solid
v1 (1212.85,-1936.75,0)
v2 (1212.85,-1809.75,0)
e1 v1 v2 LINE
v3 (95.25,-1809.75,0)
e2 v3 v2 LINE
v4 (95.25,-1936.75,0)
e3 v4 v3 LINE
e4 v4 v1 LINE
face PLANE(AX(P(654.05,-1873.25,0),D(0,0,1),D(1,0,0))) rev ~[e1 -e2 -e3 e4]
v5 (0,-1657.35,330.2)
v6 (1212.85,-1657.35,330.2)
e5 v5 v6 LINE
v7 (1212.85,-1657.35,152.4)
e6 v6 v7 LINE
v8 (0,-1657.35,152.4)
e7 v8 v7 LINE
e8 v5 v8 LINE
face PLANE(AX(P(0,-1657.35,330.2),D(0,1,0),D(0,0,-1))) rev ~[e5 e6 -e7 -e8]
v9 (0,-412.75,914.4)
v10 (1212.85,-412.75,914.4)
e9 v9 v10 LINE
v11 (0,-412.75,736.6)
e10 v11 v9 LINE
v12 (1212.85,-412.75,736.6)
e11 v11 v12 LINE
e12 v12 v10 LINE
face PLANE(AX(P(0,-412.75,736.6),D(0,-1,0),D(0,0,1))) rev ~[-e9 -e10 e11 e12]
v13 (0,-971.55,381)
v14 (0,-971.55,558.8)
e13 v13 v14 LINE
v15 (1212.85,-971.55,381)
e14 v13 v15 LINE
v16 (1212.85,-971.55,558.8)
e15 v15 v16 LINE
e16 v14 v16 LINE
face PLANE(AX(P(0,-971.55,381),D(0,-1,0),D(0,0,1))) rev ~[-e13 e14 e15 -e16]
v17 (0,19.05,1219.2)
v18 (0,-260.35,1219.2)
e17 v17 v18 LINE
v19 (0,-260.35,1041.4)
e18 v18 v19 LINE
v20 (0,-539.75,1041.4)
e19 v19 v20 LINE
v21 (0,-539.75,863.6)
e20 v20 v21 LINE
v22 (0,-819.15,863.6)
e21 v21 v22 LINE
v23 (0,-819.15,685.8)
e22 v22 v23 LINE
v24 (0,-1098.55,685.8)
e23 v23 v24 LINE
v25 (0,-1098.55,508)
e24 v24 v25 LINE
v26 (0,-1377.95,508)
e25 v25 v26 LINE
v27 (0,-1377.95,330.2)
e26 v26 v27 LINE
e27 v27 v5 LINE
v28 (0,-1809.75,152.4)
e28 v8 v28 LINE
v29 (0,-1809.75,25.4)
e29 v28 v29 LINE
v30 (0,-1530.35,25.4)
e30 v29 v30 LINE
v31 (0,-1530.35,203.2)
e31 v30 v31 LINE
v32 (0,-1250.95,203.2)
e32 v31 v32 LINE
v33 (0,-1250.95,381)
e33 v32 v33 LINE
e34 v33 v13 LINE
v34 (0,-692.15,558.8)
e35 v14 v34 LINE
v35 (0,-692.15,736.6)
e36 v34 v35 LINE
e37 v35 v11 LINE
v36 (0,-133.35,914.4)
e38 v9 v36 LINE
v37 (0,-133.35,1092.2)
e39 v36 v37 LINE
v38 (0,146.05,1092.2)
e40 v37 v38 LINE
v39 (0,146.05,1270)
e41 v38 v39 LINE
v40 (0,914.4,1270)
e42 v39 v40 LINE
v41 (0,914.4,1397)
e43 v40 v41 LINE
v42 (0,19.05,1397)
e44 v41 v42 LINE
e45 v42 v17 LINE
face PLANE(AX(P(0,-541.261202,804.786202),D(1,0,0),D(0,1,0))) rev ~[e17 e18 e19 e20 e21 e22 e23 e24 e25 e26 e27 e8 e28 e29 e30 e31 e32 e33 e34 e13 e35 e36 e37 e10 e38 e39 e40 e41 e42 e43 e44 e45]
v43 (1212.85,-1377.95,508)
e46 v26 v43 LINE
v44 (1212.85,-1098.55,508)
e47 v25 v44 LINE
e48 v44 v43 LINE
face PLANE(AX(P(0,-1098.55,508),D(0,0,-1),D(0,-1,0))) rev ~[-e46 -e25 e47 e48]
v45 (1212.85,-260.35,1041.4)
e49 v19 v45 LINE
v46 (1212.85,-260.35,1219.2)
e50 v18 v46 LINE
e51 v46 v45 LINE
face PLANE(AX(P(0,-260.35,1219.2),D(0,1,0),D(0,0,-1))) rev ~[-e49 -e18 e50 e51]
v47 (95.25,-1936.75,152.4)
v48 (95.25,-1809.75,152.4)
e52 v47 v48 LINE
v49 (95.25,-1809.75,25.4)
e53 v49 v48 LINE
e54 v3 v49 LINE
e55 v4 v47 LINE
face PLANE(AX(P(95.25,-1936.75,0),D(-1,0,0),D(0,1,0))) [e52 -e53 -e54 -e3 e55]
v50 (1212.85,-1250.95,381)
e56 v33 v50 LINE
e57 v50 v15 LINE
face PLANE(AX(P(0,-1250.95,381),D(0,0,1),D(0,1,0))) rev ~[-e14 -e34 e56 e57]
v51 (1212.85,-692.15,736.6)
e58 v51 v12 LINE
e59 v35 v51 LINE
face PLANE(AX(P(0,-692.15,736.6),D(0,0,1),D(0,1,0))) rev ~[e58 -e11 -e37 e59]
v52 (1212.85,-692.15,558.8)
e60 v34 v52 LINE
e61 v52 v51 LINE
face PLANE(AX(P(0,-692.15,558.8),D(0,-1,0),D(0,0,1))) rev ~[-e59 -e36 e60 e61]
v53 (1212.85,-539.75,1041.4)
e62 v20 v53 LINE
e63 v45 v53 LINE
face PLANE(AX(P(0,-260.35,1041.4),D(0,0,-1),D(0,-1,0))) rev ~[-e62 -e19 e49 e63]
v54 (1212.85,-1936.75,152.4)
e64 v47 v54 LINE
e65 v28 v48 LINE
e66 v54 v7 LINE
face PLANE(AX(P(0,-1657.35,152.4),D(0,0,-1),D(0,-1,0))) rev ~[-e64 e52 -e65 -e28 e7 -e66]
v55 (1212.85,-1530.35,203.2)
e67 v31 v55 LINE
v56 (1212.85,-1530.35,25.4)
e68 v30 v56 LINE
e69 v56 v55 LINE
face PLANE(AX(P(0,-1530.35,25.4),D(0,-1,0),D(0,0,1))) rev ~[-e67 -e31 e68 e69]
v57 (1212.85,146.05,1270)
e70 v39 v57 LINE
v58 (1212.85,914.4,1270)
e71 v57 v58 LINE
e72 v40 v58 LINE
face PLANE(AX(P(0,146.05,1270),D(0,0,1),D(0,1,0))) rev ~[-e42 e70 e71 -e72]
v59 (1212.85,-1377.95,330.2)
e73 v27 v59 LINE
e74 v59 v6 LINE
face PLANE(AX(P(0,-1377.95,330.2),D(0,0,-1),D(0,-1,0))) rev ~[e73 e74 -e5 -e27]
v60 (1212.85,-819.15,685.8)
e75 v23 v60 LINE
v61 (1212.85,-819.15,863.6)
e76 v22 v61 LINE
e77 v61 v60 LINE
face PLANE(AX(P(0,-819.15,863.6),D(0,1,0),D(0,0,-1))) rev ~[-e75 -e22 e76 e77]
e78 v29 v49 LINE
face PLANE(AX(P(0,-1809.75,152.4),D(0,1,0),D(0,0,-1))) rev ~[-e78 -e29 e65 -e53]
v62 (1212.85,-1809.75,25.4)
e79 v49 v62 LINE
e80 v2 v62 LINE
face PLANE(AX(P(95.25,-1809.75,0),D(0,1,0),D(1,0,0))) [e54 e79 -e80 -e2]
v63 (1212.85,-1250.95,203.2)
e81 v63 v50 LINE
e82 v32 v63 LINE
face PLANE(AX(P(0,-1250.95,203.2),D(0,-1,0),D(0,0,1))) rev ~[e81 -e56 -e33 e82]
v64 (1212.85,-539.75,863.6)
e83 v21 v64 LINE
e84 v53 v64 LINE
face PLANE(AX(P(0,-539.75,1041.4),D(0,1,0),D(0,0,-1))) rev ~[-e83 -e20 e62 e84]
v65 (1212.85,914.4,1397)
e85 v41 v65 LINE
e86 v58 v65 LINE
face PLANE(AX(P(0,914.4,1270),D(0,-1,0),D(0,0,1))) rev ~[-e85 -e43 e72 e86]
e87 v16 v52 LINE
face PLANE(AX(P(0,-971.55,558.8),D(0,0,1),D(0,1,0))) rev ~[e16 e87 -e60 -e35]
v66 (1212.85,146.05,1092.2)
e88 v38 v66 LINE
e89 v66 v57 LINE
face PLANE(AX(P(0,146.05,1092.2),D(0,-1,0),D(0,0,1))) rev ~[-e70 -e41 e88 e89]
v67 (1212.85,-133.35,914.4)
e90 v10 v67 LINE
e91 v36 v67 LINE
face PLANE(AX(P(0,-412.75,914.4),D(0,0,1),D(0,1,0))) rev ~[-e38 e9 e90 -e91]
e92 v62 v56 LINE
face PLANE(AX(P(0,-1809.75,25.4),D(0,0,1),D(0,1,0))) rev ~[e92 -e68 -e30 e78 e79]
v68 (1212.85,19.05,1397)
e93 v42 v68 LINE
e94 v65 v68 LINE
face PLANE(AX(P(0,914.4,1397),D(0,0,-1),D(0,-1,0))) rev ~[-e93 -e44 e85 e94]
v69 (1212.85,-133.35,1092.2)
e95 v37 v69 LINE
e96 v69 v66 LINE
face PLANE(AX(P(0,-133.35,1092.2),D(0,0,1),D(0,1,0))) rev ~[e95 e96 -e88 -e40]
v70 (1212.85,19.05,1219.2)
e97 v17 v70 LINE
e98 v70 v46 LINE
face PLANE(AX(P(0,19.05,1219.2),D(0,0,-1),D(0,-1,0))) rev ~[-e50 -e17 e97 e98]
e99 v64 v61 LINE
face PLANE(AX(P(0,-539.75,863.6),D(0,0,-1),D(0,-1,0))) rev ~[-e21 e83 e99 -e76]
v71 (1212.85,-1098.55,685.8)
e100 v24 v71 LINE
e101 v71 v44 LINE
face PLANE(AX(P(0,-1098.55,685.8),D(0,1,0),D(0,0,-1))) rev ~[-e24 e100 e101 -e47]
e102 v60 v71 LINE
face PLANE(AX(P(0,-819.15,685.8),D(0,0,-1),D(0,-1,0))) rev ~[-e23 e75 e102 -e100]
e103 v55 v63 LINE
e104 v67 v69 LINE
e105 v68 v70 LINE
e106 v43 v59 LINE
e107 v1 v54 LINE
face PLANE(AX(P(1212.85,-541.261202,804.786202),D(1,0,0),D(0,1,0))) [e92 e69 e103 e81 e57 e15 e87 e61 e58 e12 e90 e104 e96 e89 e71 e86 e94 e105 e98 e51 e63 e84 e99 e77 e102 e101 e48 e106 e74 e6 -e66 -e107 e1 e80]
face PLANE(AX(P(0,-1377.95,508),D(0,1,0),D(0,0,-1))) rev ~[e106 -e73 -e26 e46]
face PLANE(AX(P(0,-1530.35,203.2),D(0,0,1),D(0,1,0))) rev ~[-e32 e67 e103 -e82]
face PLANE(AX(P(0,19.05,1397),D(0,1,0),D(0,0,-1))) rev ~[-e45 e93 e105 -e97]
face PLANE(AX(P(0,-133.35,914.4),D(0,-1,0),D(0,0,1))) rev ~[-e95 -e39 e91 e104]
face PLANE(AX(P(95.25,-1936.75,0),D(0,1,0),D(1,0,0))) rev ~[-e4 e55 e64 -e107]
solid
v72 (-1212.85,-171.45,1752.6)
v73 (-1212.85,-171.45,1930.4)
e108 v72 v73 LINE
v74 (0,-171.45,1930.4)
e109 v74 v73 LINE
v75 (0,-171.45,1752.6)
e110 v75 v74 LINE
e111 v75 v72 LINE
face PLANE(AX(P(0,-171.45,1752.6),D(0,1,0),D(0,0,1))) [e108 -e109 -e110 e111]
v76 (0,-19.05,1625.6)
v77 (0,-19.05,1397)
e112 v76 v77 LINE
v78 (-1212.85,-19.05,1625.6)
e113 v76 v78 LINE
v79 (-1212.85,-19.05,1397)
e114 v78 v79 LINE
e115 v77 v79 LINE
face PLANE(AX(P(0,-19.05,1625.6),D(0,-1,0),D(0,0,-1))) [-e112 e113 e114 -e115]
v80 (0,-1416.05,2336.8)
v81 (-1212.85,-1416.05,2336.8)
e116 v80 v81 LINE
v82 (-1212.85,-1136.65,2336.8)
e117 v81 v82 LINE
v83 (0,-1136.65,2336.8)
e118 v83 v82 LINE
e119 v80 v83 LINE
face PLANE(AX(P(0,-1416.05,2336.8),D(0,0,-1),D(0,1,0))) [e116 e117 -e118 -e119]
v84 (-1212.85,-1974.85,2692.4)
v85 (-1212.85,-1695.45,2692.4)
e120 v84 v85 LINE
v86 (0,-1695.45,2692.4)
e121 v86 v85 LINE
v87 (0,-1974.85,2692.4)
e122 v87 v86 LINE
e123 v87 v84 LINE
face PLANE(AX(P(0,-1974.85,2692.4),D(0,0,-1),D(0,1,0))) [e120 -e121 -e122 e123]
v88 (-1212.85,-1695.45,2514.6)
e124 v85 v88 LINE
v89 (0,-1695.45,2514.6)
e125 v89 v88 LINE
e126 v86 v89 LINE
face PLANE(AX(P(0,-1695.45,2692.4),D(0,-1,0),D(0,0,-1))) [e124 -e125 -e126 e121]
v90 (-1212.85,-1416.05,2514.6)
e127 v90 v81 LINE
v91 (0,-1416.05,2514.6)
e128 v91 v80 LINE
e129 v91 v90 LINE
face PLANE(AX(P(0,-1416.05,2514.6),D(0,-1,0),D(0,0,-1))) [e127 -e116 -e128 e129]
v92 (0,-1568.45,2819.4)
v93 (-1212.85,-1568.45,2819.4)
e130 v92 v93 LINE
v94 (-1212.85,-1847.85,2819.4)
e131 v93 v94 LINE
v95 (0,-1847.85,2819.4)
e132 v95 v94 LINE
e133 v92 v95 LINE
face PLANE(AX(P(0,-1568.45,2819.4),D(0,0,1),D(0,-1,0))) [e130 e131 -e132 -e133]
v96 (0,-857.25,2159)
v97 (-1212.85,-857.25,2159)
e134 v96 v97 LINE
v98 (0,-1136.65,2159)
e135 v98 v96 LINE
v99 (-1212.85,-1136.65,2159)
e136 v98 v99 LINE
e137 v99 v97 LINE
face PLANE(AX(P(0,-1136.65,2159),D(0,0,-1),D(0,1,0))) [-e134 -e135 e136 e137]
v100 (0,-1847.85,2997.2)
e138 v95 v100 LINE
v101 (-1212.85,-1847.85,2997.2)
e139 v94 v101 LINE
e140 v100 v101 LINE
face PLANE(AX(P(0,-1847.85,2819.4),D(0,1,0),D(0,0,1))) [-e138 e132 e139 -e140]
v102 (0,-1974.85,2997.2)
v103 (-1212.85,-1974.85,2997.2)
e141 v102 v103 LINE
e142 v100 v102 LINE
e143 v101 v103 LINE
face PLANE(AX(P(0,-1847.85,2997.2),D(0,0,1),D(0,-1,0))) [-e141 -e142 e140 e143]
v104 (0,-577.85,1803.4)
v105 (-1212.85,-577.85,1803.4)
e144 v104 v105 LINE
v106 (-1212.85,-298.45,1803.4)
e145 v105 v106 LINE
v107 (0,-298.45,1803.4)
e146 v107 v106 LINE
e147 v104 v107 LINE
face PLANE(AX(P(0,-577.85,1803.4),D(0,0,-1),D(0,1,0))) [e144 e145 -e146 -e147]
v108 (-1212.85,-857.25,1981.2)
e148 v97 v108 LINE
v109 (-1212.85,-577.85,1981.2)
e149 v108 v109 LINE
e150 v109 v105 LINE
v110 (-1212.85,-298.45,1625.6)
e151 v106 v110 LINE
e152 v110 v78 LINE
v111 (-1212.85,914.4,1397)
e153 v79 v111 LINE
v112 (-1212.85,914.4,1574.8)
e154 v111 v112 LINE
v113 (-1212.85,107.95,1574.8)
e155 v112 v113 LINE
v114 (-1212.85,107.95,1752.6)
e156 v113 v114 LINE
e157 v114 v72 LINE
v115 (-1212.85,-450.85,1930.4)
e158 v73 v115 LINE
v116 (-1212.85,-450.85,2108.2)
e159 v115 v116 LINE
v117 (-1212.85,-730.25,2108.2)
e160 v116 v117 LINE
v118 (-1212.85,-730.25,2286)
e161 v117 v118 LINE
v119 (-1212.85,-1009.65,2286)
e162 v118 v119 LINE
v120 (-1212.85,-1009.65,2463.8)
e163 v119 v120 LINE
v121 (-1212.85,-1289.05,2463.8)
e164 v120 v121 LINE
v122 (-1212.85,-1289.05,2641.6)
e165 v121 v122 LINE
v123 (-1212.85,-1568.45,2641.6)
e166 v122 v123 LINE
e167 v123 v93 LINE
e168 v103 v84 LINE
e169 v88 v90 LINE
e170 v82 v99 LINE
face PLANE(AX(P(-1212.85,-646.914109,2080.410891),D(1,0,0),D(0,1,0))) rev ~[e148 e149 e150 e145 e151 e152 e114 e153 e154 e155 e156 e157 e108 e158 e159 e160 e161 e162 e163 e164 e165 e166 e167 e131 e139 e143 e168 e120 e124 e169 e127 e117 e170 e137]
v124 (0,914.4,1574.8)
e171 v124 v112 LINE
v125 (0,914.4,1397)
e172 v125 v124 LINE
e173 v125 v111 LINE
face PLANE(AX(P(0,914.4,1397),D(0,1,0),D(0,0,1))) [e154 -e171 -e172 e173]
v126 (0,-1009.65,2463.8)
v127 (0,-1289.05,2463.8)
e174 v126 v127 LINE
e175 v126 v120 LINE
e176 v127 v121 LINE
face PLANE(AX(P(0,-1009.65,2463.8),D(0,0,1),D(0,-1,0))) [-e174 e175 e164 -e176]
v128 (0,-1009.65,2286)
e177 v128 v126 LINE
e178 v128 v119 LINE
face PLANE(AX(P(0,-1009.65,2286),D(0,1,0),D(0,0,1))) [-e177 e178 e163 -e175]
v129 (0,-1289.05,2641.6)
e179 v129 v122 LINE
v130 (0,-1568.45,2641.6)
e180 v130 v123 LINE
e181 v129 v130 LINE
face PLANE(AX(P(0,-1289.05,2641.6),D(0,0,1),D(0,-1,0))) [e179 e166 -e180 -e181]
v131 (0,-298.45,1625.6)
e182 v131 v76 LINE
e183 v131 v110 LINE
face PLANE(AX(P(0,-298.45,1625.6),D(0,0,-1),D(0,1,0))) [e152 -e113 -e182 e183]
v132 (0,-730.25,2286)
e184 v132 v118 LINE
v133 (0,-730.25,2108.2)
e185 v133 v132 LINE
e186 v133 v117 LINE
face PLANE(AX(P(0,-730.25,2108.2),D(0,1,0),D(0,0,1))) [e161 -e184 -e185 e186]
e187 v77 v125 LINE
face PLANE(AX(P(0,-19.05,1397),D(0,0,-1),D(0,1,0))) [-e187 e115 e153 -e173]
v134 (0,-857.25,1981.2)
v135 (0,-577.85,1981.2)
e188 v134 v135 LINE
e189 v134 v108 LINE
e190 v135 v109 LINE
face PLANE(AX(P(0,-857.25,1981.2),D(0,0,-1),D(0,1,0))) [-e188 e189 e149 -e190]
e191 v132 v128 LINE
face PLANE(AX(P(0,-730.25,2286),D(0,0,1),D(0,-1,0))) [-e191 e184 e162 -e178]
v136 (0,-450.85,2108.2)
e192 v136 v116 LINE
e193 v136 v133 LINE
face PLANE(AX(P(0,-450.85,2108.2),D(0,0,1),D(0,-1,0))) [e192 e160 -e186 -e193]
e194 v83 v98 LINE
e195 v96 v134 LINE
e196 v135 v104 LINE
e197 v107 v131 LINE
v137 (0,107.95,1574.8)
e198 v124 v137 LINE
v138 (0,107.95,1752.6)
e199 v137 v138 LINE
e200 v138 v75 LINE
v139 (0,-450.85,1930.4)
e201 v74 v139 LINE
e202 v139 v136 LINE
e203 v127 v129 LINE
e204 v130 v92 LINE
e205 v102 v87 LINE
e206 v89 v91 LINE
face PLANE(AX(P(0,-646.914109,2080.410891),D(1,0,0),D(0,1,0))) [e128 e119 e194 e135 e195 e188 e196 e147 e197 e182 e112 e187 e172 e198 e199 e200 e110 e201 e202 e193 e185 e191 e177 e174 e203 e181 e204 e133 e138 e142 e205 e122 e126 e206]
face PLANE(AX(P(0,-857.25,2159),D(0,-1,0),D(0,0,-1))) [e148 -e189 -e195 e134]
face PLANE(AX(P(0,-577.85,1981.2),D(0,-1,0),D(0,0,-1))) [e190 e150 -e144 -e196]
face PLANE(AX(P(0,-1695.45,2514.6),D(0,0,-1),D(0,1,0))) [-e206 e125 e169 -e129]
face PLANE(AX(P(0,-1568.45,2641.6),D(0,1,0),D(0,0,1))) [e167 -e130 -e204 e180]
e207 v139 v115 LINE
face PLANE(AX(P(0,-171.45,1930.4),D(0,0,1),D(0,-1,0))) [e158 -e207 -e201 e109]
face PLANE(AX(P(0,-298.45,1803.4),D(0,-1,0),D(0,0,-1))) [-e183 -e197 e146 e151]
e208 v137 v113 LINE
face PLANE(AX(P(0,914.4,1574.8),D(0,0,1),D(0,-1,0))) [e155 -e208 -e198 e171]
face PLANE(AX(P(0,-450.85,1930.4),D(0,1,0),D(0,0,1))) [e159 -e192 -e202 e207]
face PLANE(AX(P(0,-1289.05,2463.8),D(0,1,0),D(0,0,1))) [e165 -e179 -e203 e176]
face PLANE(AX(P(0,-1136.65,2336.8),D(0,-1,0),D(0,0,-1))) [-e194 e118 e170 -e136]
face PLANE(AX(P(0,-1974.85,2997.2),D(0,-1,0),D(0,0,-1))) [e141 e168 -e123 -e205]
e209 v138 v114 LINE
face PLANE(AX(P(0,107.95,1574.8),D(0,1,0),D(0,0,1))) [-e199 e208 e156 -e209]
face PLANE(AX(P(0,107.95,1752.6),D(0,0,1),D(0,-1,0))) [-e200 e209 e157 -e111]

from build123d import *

# Parameters (mm, degrees)
F2_W     = 1117.6
F2_H     = 127
F3_DEPTH = 152.4
F5_DEPTH = 1212.85
F7_DEPTH = 1212.85


# Not quite as in the source:
# - a variable given as a bare number and used for a length is read in inches; the dataset says mm whatever the document's units were


with BuildPart() as f3:
    # F2 (on Top) → F3 (new body)
    with BuildSketch(Plane.XY):
        with Locations((654.05, -1873.25)):
            Rectangle(F2_W, F2_H)
    extrude(amount=F3_DEPTH)

    # F4 (on Right) → F5 (join)
    with BuildSketch(Plane.YZ):
        Polygon((-1657.35, 152.4), (-1809.75, 152.4), (-1809.75, 25.4), (-1530.35, 25.4), (-1530.35, 203.2), (-1250.95, 203.2), (-1250.95, 381), (-971.55, 381), (-971.55, 558.8), (-692.15, 558.8), (-692.15, 736.6), (-412.75, 736.6), (-412.75, 914.4), (-133.35, 914.4), (-133.35, 1092.2), (146.05, 1092.2), (146.05, 1270), (914.4, 1270), (914.4, 1397), (19.05, 1397), (19.05, 1219.2), (-260.35, 1219.2), (-260.35, 1041.4), (-539.75, 1041.4), (-539.75, 863.6), (-819.15, 863.6), (-819.15, 685.8), (-1098.55, 685.8), (-1098.55, 508), (-1377.95, 508), (-1377.95, 330.2), (-1657.35, 330.2), align=None)
    extrude(amount=F5_DEPTH)


with BuildPart() as f7:
    # F6 (on Right) → F7 (new body)
    with BuildSketch(Plane.YZ):
        Polygon((-19.05, 1397), (914.4, 1397), (914.4, 1574.8), (107.95, 1574.8), (107.95, 1752.6), (-171.45, 1752.6), (-171.45, 1930.4), (-450.85, 1930.4), (-450.85, 2108.2), (-730.25, 2108.2), (-730.25, 2286), (-1009.65, 2286), (-1009.65, 2463.8), (-1289.05, 2463.8), (-1289.05, 2641.6), (-1568.45, 2641.6), (-1568.45, 2819.4), (-1847.85, 2819.4), (-1847.85, 2997.2), (-1974.85, 2997.2), (-1974.85, 2692.4), (-1695.45, 2692.4), (-1695.45, 2514.6), (-1416.05, 2514.6), (-1416.05, 2336.8), (-1136.65, 2336.8), (-1136.65, 2159), (-857.25, 2159), (-857.25, 1981.2), (-577.85, 1981.2), (-577.85, 1803.4), (-298.45, 1803.4), (-298.45, 1625.6), (-19.05, 1625.6), align=None)
    extrude(amount=-F7_DEPTH)


solid = Compound([f3.part, f7.part])
